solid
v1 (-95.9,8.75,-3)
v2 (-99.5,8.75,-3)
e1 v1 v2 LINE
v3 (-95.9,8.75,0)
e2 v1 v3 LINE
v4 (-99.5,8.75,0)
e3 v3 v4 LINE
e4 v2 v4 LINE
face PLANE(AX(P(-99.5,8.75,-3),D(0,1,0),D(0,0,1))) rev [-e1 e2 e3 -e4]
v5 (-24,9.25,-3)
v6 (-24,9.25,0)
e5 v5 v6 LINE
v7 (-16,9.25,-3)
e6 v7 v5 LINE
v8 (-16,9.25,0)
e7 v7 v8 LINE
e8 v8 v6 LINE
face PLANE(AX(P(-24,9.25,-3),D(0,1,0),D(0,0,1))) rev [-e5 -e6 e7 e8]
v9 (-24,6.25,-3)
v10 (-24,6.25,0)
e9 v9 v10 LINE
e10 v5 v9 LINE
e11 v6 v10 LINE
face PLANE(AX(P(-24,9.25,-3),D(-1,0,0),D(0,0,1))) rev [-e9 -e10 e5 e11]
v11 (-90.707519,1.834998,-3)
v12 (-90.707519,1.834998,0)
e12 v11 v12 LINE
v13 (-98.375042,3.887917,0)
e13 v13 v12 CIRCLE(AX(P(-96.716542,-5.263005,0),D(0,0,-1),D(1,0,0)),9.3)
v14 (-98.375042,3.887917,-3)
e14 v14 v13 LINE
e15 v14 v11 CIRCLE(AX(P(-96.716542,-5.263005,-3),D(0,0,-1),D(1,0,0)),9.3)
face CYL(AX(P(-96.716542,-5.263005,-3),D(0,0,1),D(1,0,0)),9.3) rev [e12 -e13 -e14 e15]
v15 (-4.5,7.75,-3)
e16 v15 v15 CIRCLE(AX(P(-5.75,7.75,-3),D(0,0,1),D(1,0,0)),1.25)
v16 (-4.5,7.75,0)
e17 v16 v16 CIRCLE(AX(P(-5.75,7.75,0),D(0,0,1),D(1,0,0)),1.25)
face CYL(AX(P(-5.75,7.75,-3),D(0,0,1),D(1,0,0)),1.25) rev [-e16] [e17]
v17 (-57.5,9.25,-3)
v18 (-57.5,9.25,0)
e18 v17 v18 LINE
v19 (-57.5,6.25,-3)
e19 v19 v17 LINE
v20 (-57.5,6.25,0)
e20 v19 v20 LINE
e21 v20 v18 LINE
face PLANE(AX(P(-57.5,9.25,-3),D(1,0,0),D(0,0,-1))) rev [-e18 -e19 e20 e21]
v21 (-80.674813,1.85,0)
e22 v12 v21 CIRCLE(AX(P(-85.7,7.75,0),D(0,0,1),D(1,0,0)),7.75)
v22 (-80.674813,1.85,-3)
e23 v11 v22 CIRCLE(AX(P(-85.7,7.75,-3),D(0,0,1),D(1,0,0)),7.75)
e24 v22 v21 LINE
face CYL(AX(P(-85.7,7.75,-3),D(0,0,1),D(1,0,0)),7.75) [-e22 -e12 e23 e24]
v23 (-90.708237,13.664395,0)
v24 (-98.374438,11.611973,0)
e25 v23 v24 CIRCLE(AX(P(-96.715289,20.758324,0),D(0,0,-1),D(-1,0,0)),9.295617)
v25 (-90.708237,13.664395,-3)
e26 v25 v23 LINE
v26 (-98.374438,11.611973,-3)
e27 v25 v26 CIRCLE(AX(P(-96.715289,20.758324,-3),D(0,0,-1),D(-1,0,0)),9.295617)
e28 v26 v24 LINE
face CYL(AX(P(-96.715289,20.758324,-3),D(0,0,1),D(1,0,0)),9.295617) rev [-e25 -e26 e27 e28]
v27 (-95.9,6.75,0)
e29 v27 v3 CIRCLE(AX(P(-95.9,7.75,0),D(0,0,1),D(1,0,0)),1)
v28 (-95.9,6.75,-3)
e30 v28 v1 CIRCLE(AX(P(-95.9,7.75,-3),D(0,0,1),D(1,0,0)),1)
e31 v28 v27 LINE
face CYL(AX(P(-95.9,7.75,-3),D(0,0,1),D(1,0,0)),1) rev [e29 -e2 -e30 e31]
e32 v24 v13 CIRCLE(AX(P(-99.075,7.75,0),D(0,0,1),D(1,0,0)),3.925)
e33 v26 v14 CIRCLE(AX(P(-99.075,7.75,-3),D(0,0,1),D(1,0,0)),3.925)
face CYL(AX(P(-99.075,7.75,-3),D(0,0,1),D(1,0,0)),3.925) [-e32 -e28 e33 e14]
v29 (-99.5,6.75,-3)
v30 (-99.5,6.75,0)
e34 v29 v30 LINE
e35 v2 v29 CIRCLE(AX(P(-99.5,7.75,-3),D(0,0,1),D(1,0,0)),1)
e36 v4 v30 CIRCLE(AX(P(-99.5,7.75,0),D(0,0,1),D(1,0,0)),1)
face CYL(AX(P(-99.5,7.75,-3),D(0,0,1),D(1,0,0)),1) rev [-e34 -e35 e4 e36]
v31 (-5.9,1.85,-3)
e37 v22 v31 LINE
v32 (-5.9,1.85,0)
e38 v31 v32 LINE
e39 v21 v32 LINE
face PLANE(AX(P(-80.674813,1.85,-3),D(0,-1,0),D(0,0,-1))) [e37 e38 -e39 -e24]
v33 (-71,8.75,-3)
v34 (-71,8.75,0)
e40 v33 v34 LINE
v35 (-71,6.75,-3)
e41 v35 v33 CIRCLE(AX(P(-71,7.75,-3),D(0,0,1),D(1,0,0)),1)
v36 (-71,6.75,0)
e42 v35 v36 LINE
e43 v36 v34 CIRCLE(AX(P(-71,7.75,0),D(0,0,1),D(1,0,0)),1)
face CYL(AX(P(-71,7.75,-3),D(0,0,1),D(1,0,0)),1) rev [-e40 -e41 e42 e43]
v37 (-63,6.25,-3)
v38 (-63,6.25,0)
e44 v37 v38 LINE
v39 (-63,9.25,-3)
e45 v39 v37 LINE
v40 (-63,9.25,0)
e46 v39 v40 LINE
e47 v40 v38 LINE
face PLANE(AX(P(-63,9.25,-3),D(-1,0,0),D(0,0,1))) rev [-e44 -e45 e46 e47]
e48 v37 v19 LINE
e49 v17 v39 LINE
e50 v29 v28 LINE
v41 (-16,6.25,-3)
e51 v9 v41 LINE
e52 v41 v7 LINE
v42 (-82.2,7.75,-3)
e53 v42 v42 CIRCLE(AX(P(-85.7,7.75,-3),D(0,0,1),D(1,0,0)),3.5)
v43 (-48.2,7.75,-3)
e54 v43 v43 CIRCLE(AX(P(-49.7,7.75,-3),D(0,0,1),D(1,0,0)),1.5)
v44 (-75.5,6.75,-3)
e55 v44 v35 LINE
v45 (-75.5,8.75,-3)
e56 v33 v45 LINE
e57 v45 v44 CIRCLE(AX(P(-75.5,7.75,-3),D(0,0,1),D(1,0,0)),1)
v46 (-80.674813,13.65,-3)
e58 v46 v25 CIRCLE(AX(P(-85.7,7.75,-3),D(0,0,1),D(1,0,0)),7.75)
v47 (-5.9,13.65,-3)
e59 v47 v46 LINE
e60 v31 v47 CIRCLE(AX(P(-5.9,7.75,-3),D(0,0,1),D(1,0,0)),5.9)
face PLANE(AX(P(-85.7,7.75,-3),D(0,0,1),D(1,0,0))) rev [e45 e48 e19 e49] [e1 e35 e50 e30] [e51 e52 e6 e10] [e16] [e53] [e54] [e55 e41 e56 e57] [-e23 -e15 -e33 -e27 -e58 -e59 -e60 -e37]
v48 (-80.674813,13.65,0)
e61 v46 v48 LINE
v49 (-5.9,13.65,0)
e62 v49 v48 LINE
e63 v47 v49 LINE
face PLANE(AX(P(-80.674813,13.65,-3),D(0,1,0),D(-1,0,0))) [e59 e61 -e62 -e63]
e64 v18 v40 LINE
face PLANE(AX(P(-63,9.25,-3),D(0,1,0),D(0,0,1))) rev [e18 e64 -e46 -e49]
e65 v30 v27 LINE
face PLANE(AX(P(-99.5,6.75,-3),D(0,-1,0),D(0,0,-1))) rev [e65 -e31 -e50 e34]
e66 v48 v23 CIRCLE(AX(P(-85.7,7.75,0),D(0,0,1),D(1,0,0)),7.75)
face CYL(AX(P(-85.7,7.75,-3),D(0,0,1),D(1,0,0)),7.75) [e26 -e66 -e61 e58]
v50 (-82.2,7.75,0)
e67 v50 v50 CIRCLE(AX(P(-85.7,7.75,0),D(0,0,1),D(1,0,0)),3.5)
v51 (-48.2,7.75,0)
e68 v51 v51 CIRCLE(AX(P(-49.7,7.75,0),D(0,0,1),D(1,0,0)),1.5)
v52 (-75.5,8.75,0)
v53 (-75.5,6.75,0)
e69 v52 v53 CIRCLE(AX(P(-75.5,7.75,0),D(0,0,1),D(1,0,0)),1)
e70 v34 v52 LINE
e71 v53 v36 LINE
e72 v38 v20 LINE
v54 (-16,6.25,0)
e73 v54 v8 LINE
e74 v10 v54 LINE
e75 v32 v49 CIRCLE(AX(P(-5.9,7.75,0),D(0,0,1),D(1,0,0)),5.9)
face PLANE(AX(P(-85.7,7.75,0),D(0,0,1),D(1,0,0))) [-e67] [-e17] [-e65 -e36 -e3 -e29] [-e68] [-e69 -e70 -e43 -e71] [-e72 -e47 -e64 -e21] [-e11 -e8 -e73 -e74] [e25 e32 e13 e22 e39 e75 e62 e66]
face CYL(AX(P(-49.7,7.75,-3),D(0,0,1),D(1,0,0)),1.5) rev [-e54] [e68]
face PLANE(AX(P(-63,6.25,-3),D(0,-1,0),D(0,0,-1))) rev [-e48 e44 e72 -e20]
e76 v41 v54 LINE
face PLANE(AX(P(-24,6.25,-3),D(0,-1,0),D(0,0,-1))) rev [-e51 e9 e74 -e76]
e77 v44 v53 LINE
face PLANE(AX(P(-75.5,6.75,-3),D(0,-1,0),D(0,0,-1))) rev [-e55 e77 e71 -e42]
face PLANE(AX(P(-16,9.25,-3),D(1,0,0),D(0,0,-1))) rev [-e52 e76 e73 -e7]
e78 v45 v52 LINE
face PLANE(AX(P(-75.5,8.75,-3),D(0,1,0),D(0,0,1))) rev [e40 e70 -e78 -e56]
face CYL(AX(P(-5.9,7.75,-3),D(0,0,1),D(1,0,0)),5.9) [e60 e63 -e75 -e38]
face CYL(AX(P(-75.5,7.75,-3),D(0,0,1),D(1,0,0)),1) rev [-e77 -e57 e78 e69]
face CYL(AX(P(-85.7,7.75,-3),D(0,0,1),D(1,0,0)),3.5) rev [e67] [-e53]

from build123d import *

# Parameters (mm, degrees)
ESQUISSE2_R               = 3.5
ESQUISSE2_R_2             = 1.25
ESQUISSE2_R_3             = 1.5
ESQUISSE2_W               = 8
ESQUISSE2_H               = 3
ESQUISSE2_W_2             = 5.5
T_LE_DE_BASE_PLI_E1_DEPTH = 3


# Sheet-metal steps are written as plain solids
with BuildPart() as part:
    # Esquisse2 → Tôle de base pliée1 (new body)
    with BuildSketch(Plane.XY):
        with BuildLine():
            Line((-80.674813436, 13.65), (-5.9, 13.65))
            ThreePointArc((-5.9, 13.65), (0, 7.75), (-5.9, 1.85))
            Line((-5.9, 1.85), (-80.674813436, 1.85))
            ThreePointArc((-80.674813436, 1.85), (-85.688411127, 8.665e-06), (-90.707519116, 1.834997692))
            ThreePointArc((-90.707519116, 1.834997692), (-94.311259808, 3.720569786), (-98.375041782, 3.887917208))
            ThreePointArc((-98.375041782, 3.887917208), (-102.999999988, 7.750307003), (-98.374437627, 11.611973247))
            ThreePointArc((-98.374437627, 11.611973247), (-94.311297529, 11.778940178), (-90.708236779, 13.664394674))
            ThreePointArc((-90.708236779, 13.664394674), (-85.688881301, 15.499992024), (-80.674813436, 13.65))
        make_face()
        with Locations((-85.7, 7.75)):
            Circle(ESQUISSE2_R, mode=Mode.SUBTRACT)
        with Locations((-5.75, 7.75)):
            Circle(ESQUISSE2_R_2, mode=Mode.SUBTRACT)
        with Locations((-49.7, 7.75)):
            Circle(ESQUISSE2_R_3, mode=Mode.SUBTRACT)
        with Locations((-20, 7.75)):
            Rectangle(ESQUISSE2_W, ESQUISSE2_H, mode=Mode.SUBTRACT)
        with Locations((-60.25, 7.75)):
            Rectangle(ESQUISSE2_W_2, ESQUISSE2_H, mode=Mode.SUBTRACT)
        with BuildLine():
            Line((-75.5, 8.75), (-71, 8.75))
            ThreePointArc((-71, 8.75), (-70, 7.75), (-71, 6.75))
            Line((-71, 6.75), (-75.5, 6.75))
            ThreePointArc((-75.5, 6.75), (-76.5, 7.75), (-75.5, 8.75))
        make_face(mode=Mode.SUBTRACT)
        with BuildLine():
            Line((-99.5, 8.75), (-95.9, 8.75))
            ThreePointArc((-95.9, 8.75), (-94.9, 7.75), (-95.9, 6.75))
            Line((-95.9, 6.75), (-99.5, 6.75))
            ThreePointArc((-99.5, 6.75), (-100.5, 7.75), (-99.5, 8.75))
        make_face(mode=Mode.SUBTRACT)
    extrude(amount=-T_LE_DE_BASE_PLI_E1_DEPTH)


solid = part.part
